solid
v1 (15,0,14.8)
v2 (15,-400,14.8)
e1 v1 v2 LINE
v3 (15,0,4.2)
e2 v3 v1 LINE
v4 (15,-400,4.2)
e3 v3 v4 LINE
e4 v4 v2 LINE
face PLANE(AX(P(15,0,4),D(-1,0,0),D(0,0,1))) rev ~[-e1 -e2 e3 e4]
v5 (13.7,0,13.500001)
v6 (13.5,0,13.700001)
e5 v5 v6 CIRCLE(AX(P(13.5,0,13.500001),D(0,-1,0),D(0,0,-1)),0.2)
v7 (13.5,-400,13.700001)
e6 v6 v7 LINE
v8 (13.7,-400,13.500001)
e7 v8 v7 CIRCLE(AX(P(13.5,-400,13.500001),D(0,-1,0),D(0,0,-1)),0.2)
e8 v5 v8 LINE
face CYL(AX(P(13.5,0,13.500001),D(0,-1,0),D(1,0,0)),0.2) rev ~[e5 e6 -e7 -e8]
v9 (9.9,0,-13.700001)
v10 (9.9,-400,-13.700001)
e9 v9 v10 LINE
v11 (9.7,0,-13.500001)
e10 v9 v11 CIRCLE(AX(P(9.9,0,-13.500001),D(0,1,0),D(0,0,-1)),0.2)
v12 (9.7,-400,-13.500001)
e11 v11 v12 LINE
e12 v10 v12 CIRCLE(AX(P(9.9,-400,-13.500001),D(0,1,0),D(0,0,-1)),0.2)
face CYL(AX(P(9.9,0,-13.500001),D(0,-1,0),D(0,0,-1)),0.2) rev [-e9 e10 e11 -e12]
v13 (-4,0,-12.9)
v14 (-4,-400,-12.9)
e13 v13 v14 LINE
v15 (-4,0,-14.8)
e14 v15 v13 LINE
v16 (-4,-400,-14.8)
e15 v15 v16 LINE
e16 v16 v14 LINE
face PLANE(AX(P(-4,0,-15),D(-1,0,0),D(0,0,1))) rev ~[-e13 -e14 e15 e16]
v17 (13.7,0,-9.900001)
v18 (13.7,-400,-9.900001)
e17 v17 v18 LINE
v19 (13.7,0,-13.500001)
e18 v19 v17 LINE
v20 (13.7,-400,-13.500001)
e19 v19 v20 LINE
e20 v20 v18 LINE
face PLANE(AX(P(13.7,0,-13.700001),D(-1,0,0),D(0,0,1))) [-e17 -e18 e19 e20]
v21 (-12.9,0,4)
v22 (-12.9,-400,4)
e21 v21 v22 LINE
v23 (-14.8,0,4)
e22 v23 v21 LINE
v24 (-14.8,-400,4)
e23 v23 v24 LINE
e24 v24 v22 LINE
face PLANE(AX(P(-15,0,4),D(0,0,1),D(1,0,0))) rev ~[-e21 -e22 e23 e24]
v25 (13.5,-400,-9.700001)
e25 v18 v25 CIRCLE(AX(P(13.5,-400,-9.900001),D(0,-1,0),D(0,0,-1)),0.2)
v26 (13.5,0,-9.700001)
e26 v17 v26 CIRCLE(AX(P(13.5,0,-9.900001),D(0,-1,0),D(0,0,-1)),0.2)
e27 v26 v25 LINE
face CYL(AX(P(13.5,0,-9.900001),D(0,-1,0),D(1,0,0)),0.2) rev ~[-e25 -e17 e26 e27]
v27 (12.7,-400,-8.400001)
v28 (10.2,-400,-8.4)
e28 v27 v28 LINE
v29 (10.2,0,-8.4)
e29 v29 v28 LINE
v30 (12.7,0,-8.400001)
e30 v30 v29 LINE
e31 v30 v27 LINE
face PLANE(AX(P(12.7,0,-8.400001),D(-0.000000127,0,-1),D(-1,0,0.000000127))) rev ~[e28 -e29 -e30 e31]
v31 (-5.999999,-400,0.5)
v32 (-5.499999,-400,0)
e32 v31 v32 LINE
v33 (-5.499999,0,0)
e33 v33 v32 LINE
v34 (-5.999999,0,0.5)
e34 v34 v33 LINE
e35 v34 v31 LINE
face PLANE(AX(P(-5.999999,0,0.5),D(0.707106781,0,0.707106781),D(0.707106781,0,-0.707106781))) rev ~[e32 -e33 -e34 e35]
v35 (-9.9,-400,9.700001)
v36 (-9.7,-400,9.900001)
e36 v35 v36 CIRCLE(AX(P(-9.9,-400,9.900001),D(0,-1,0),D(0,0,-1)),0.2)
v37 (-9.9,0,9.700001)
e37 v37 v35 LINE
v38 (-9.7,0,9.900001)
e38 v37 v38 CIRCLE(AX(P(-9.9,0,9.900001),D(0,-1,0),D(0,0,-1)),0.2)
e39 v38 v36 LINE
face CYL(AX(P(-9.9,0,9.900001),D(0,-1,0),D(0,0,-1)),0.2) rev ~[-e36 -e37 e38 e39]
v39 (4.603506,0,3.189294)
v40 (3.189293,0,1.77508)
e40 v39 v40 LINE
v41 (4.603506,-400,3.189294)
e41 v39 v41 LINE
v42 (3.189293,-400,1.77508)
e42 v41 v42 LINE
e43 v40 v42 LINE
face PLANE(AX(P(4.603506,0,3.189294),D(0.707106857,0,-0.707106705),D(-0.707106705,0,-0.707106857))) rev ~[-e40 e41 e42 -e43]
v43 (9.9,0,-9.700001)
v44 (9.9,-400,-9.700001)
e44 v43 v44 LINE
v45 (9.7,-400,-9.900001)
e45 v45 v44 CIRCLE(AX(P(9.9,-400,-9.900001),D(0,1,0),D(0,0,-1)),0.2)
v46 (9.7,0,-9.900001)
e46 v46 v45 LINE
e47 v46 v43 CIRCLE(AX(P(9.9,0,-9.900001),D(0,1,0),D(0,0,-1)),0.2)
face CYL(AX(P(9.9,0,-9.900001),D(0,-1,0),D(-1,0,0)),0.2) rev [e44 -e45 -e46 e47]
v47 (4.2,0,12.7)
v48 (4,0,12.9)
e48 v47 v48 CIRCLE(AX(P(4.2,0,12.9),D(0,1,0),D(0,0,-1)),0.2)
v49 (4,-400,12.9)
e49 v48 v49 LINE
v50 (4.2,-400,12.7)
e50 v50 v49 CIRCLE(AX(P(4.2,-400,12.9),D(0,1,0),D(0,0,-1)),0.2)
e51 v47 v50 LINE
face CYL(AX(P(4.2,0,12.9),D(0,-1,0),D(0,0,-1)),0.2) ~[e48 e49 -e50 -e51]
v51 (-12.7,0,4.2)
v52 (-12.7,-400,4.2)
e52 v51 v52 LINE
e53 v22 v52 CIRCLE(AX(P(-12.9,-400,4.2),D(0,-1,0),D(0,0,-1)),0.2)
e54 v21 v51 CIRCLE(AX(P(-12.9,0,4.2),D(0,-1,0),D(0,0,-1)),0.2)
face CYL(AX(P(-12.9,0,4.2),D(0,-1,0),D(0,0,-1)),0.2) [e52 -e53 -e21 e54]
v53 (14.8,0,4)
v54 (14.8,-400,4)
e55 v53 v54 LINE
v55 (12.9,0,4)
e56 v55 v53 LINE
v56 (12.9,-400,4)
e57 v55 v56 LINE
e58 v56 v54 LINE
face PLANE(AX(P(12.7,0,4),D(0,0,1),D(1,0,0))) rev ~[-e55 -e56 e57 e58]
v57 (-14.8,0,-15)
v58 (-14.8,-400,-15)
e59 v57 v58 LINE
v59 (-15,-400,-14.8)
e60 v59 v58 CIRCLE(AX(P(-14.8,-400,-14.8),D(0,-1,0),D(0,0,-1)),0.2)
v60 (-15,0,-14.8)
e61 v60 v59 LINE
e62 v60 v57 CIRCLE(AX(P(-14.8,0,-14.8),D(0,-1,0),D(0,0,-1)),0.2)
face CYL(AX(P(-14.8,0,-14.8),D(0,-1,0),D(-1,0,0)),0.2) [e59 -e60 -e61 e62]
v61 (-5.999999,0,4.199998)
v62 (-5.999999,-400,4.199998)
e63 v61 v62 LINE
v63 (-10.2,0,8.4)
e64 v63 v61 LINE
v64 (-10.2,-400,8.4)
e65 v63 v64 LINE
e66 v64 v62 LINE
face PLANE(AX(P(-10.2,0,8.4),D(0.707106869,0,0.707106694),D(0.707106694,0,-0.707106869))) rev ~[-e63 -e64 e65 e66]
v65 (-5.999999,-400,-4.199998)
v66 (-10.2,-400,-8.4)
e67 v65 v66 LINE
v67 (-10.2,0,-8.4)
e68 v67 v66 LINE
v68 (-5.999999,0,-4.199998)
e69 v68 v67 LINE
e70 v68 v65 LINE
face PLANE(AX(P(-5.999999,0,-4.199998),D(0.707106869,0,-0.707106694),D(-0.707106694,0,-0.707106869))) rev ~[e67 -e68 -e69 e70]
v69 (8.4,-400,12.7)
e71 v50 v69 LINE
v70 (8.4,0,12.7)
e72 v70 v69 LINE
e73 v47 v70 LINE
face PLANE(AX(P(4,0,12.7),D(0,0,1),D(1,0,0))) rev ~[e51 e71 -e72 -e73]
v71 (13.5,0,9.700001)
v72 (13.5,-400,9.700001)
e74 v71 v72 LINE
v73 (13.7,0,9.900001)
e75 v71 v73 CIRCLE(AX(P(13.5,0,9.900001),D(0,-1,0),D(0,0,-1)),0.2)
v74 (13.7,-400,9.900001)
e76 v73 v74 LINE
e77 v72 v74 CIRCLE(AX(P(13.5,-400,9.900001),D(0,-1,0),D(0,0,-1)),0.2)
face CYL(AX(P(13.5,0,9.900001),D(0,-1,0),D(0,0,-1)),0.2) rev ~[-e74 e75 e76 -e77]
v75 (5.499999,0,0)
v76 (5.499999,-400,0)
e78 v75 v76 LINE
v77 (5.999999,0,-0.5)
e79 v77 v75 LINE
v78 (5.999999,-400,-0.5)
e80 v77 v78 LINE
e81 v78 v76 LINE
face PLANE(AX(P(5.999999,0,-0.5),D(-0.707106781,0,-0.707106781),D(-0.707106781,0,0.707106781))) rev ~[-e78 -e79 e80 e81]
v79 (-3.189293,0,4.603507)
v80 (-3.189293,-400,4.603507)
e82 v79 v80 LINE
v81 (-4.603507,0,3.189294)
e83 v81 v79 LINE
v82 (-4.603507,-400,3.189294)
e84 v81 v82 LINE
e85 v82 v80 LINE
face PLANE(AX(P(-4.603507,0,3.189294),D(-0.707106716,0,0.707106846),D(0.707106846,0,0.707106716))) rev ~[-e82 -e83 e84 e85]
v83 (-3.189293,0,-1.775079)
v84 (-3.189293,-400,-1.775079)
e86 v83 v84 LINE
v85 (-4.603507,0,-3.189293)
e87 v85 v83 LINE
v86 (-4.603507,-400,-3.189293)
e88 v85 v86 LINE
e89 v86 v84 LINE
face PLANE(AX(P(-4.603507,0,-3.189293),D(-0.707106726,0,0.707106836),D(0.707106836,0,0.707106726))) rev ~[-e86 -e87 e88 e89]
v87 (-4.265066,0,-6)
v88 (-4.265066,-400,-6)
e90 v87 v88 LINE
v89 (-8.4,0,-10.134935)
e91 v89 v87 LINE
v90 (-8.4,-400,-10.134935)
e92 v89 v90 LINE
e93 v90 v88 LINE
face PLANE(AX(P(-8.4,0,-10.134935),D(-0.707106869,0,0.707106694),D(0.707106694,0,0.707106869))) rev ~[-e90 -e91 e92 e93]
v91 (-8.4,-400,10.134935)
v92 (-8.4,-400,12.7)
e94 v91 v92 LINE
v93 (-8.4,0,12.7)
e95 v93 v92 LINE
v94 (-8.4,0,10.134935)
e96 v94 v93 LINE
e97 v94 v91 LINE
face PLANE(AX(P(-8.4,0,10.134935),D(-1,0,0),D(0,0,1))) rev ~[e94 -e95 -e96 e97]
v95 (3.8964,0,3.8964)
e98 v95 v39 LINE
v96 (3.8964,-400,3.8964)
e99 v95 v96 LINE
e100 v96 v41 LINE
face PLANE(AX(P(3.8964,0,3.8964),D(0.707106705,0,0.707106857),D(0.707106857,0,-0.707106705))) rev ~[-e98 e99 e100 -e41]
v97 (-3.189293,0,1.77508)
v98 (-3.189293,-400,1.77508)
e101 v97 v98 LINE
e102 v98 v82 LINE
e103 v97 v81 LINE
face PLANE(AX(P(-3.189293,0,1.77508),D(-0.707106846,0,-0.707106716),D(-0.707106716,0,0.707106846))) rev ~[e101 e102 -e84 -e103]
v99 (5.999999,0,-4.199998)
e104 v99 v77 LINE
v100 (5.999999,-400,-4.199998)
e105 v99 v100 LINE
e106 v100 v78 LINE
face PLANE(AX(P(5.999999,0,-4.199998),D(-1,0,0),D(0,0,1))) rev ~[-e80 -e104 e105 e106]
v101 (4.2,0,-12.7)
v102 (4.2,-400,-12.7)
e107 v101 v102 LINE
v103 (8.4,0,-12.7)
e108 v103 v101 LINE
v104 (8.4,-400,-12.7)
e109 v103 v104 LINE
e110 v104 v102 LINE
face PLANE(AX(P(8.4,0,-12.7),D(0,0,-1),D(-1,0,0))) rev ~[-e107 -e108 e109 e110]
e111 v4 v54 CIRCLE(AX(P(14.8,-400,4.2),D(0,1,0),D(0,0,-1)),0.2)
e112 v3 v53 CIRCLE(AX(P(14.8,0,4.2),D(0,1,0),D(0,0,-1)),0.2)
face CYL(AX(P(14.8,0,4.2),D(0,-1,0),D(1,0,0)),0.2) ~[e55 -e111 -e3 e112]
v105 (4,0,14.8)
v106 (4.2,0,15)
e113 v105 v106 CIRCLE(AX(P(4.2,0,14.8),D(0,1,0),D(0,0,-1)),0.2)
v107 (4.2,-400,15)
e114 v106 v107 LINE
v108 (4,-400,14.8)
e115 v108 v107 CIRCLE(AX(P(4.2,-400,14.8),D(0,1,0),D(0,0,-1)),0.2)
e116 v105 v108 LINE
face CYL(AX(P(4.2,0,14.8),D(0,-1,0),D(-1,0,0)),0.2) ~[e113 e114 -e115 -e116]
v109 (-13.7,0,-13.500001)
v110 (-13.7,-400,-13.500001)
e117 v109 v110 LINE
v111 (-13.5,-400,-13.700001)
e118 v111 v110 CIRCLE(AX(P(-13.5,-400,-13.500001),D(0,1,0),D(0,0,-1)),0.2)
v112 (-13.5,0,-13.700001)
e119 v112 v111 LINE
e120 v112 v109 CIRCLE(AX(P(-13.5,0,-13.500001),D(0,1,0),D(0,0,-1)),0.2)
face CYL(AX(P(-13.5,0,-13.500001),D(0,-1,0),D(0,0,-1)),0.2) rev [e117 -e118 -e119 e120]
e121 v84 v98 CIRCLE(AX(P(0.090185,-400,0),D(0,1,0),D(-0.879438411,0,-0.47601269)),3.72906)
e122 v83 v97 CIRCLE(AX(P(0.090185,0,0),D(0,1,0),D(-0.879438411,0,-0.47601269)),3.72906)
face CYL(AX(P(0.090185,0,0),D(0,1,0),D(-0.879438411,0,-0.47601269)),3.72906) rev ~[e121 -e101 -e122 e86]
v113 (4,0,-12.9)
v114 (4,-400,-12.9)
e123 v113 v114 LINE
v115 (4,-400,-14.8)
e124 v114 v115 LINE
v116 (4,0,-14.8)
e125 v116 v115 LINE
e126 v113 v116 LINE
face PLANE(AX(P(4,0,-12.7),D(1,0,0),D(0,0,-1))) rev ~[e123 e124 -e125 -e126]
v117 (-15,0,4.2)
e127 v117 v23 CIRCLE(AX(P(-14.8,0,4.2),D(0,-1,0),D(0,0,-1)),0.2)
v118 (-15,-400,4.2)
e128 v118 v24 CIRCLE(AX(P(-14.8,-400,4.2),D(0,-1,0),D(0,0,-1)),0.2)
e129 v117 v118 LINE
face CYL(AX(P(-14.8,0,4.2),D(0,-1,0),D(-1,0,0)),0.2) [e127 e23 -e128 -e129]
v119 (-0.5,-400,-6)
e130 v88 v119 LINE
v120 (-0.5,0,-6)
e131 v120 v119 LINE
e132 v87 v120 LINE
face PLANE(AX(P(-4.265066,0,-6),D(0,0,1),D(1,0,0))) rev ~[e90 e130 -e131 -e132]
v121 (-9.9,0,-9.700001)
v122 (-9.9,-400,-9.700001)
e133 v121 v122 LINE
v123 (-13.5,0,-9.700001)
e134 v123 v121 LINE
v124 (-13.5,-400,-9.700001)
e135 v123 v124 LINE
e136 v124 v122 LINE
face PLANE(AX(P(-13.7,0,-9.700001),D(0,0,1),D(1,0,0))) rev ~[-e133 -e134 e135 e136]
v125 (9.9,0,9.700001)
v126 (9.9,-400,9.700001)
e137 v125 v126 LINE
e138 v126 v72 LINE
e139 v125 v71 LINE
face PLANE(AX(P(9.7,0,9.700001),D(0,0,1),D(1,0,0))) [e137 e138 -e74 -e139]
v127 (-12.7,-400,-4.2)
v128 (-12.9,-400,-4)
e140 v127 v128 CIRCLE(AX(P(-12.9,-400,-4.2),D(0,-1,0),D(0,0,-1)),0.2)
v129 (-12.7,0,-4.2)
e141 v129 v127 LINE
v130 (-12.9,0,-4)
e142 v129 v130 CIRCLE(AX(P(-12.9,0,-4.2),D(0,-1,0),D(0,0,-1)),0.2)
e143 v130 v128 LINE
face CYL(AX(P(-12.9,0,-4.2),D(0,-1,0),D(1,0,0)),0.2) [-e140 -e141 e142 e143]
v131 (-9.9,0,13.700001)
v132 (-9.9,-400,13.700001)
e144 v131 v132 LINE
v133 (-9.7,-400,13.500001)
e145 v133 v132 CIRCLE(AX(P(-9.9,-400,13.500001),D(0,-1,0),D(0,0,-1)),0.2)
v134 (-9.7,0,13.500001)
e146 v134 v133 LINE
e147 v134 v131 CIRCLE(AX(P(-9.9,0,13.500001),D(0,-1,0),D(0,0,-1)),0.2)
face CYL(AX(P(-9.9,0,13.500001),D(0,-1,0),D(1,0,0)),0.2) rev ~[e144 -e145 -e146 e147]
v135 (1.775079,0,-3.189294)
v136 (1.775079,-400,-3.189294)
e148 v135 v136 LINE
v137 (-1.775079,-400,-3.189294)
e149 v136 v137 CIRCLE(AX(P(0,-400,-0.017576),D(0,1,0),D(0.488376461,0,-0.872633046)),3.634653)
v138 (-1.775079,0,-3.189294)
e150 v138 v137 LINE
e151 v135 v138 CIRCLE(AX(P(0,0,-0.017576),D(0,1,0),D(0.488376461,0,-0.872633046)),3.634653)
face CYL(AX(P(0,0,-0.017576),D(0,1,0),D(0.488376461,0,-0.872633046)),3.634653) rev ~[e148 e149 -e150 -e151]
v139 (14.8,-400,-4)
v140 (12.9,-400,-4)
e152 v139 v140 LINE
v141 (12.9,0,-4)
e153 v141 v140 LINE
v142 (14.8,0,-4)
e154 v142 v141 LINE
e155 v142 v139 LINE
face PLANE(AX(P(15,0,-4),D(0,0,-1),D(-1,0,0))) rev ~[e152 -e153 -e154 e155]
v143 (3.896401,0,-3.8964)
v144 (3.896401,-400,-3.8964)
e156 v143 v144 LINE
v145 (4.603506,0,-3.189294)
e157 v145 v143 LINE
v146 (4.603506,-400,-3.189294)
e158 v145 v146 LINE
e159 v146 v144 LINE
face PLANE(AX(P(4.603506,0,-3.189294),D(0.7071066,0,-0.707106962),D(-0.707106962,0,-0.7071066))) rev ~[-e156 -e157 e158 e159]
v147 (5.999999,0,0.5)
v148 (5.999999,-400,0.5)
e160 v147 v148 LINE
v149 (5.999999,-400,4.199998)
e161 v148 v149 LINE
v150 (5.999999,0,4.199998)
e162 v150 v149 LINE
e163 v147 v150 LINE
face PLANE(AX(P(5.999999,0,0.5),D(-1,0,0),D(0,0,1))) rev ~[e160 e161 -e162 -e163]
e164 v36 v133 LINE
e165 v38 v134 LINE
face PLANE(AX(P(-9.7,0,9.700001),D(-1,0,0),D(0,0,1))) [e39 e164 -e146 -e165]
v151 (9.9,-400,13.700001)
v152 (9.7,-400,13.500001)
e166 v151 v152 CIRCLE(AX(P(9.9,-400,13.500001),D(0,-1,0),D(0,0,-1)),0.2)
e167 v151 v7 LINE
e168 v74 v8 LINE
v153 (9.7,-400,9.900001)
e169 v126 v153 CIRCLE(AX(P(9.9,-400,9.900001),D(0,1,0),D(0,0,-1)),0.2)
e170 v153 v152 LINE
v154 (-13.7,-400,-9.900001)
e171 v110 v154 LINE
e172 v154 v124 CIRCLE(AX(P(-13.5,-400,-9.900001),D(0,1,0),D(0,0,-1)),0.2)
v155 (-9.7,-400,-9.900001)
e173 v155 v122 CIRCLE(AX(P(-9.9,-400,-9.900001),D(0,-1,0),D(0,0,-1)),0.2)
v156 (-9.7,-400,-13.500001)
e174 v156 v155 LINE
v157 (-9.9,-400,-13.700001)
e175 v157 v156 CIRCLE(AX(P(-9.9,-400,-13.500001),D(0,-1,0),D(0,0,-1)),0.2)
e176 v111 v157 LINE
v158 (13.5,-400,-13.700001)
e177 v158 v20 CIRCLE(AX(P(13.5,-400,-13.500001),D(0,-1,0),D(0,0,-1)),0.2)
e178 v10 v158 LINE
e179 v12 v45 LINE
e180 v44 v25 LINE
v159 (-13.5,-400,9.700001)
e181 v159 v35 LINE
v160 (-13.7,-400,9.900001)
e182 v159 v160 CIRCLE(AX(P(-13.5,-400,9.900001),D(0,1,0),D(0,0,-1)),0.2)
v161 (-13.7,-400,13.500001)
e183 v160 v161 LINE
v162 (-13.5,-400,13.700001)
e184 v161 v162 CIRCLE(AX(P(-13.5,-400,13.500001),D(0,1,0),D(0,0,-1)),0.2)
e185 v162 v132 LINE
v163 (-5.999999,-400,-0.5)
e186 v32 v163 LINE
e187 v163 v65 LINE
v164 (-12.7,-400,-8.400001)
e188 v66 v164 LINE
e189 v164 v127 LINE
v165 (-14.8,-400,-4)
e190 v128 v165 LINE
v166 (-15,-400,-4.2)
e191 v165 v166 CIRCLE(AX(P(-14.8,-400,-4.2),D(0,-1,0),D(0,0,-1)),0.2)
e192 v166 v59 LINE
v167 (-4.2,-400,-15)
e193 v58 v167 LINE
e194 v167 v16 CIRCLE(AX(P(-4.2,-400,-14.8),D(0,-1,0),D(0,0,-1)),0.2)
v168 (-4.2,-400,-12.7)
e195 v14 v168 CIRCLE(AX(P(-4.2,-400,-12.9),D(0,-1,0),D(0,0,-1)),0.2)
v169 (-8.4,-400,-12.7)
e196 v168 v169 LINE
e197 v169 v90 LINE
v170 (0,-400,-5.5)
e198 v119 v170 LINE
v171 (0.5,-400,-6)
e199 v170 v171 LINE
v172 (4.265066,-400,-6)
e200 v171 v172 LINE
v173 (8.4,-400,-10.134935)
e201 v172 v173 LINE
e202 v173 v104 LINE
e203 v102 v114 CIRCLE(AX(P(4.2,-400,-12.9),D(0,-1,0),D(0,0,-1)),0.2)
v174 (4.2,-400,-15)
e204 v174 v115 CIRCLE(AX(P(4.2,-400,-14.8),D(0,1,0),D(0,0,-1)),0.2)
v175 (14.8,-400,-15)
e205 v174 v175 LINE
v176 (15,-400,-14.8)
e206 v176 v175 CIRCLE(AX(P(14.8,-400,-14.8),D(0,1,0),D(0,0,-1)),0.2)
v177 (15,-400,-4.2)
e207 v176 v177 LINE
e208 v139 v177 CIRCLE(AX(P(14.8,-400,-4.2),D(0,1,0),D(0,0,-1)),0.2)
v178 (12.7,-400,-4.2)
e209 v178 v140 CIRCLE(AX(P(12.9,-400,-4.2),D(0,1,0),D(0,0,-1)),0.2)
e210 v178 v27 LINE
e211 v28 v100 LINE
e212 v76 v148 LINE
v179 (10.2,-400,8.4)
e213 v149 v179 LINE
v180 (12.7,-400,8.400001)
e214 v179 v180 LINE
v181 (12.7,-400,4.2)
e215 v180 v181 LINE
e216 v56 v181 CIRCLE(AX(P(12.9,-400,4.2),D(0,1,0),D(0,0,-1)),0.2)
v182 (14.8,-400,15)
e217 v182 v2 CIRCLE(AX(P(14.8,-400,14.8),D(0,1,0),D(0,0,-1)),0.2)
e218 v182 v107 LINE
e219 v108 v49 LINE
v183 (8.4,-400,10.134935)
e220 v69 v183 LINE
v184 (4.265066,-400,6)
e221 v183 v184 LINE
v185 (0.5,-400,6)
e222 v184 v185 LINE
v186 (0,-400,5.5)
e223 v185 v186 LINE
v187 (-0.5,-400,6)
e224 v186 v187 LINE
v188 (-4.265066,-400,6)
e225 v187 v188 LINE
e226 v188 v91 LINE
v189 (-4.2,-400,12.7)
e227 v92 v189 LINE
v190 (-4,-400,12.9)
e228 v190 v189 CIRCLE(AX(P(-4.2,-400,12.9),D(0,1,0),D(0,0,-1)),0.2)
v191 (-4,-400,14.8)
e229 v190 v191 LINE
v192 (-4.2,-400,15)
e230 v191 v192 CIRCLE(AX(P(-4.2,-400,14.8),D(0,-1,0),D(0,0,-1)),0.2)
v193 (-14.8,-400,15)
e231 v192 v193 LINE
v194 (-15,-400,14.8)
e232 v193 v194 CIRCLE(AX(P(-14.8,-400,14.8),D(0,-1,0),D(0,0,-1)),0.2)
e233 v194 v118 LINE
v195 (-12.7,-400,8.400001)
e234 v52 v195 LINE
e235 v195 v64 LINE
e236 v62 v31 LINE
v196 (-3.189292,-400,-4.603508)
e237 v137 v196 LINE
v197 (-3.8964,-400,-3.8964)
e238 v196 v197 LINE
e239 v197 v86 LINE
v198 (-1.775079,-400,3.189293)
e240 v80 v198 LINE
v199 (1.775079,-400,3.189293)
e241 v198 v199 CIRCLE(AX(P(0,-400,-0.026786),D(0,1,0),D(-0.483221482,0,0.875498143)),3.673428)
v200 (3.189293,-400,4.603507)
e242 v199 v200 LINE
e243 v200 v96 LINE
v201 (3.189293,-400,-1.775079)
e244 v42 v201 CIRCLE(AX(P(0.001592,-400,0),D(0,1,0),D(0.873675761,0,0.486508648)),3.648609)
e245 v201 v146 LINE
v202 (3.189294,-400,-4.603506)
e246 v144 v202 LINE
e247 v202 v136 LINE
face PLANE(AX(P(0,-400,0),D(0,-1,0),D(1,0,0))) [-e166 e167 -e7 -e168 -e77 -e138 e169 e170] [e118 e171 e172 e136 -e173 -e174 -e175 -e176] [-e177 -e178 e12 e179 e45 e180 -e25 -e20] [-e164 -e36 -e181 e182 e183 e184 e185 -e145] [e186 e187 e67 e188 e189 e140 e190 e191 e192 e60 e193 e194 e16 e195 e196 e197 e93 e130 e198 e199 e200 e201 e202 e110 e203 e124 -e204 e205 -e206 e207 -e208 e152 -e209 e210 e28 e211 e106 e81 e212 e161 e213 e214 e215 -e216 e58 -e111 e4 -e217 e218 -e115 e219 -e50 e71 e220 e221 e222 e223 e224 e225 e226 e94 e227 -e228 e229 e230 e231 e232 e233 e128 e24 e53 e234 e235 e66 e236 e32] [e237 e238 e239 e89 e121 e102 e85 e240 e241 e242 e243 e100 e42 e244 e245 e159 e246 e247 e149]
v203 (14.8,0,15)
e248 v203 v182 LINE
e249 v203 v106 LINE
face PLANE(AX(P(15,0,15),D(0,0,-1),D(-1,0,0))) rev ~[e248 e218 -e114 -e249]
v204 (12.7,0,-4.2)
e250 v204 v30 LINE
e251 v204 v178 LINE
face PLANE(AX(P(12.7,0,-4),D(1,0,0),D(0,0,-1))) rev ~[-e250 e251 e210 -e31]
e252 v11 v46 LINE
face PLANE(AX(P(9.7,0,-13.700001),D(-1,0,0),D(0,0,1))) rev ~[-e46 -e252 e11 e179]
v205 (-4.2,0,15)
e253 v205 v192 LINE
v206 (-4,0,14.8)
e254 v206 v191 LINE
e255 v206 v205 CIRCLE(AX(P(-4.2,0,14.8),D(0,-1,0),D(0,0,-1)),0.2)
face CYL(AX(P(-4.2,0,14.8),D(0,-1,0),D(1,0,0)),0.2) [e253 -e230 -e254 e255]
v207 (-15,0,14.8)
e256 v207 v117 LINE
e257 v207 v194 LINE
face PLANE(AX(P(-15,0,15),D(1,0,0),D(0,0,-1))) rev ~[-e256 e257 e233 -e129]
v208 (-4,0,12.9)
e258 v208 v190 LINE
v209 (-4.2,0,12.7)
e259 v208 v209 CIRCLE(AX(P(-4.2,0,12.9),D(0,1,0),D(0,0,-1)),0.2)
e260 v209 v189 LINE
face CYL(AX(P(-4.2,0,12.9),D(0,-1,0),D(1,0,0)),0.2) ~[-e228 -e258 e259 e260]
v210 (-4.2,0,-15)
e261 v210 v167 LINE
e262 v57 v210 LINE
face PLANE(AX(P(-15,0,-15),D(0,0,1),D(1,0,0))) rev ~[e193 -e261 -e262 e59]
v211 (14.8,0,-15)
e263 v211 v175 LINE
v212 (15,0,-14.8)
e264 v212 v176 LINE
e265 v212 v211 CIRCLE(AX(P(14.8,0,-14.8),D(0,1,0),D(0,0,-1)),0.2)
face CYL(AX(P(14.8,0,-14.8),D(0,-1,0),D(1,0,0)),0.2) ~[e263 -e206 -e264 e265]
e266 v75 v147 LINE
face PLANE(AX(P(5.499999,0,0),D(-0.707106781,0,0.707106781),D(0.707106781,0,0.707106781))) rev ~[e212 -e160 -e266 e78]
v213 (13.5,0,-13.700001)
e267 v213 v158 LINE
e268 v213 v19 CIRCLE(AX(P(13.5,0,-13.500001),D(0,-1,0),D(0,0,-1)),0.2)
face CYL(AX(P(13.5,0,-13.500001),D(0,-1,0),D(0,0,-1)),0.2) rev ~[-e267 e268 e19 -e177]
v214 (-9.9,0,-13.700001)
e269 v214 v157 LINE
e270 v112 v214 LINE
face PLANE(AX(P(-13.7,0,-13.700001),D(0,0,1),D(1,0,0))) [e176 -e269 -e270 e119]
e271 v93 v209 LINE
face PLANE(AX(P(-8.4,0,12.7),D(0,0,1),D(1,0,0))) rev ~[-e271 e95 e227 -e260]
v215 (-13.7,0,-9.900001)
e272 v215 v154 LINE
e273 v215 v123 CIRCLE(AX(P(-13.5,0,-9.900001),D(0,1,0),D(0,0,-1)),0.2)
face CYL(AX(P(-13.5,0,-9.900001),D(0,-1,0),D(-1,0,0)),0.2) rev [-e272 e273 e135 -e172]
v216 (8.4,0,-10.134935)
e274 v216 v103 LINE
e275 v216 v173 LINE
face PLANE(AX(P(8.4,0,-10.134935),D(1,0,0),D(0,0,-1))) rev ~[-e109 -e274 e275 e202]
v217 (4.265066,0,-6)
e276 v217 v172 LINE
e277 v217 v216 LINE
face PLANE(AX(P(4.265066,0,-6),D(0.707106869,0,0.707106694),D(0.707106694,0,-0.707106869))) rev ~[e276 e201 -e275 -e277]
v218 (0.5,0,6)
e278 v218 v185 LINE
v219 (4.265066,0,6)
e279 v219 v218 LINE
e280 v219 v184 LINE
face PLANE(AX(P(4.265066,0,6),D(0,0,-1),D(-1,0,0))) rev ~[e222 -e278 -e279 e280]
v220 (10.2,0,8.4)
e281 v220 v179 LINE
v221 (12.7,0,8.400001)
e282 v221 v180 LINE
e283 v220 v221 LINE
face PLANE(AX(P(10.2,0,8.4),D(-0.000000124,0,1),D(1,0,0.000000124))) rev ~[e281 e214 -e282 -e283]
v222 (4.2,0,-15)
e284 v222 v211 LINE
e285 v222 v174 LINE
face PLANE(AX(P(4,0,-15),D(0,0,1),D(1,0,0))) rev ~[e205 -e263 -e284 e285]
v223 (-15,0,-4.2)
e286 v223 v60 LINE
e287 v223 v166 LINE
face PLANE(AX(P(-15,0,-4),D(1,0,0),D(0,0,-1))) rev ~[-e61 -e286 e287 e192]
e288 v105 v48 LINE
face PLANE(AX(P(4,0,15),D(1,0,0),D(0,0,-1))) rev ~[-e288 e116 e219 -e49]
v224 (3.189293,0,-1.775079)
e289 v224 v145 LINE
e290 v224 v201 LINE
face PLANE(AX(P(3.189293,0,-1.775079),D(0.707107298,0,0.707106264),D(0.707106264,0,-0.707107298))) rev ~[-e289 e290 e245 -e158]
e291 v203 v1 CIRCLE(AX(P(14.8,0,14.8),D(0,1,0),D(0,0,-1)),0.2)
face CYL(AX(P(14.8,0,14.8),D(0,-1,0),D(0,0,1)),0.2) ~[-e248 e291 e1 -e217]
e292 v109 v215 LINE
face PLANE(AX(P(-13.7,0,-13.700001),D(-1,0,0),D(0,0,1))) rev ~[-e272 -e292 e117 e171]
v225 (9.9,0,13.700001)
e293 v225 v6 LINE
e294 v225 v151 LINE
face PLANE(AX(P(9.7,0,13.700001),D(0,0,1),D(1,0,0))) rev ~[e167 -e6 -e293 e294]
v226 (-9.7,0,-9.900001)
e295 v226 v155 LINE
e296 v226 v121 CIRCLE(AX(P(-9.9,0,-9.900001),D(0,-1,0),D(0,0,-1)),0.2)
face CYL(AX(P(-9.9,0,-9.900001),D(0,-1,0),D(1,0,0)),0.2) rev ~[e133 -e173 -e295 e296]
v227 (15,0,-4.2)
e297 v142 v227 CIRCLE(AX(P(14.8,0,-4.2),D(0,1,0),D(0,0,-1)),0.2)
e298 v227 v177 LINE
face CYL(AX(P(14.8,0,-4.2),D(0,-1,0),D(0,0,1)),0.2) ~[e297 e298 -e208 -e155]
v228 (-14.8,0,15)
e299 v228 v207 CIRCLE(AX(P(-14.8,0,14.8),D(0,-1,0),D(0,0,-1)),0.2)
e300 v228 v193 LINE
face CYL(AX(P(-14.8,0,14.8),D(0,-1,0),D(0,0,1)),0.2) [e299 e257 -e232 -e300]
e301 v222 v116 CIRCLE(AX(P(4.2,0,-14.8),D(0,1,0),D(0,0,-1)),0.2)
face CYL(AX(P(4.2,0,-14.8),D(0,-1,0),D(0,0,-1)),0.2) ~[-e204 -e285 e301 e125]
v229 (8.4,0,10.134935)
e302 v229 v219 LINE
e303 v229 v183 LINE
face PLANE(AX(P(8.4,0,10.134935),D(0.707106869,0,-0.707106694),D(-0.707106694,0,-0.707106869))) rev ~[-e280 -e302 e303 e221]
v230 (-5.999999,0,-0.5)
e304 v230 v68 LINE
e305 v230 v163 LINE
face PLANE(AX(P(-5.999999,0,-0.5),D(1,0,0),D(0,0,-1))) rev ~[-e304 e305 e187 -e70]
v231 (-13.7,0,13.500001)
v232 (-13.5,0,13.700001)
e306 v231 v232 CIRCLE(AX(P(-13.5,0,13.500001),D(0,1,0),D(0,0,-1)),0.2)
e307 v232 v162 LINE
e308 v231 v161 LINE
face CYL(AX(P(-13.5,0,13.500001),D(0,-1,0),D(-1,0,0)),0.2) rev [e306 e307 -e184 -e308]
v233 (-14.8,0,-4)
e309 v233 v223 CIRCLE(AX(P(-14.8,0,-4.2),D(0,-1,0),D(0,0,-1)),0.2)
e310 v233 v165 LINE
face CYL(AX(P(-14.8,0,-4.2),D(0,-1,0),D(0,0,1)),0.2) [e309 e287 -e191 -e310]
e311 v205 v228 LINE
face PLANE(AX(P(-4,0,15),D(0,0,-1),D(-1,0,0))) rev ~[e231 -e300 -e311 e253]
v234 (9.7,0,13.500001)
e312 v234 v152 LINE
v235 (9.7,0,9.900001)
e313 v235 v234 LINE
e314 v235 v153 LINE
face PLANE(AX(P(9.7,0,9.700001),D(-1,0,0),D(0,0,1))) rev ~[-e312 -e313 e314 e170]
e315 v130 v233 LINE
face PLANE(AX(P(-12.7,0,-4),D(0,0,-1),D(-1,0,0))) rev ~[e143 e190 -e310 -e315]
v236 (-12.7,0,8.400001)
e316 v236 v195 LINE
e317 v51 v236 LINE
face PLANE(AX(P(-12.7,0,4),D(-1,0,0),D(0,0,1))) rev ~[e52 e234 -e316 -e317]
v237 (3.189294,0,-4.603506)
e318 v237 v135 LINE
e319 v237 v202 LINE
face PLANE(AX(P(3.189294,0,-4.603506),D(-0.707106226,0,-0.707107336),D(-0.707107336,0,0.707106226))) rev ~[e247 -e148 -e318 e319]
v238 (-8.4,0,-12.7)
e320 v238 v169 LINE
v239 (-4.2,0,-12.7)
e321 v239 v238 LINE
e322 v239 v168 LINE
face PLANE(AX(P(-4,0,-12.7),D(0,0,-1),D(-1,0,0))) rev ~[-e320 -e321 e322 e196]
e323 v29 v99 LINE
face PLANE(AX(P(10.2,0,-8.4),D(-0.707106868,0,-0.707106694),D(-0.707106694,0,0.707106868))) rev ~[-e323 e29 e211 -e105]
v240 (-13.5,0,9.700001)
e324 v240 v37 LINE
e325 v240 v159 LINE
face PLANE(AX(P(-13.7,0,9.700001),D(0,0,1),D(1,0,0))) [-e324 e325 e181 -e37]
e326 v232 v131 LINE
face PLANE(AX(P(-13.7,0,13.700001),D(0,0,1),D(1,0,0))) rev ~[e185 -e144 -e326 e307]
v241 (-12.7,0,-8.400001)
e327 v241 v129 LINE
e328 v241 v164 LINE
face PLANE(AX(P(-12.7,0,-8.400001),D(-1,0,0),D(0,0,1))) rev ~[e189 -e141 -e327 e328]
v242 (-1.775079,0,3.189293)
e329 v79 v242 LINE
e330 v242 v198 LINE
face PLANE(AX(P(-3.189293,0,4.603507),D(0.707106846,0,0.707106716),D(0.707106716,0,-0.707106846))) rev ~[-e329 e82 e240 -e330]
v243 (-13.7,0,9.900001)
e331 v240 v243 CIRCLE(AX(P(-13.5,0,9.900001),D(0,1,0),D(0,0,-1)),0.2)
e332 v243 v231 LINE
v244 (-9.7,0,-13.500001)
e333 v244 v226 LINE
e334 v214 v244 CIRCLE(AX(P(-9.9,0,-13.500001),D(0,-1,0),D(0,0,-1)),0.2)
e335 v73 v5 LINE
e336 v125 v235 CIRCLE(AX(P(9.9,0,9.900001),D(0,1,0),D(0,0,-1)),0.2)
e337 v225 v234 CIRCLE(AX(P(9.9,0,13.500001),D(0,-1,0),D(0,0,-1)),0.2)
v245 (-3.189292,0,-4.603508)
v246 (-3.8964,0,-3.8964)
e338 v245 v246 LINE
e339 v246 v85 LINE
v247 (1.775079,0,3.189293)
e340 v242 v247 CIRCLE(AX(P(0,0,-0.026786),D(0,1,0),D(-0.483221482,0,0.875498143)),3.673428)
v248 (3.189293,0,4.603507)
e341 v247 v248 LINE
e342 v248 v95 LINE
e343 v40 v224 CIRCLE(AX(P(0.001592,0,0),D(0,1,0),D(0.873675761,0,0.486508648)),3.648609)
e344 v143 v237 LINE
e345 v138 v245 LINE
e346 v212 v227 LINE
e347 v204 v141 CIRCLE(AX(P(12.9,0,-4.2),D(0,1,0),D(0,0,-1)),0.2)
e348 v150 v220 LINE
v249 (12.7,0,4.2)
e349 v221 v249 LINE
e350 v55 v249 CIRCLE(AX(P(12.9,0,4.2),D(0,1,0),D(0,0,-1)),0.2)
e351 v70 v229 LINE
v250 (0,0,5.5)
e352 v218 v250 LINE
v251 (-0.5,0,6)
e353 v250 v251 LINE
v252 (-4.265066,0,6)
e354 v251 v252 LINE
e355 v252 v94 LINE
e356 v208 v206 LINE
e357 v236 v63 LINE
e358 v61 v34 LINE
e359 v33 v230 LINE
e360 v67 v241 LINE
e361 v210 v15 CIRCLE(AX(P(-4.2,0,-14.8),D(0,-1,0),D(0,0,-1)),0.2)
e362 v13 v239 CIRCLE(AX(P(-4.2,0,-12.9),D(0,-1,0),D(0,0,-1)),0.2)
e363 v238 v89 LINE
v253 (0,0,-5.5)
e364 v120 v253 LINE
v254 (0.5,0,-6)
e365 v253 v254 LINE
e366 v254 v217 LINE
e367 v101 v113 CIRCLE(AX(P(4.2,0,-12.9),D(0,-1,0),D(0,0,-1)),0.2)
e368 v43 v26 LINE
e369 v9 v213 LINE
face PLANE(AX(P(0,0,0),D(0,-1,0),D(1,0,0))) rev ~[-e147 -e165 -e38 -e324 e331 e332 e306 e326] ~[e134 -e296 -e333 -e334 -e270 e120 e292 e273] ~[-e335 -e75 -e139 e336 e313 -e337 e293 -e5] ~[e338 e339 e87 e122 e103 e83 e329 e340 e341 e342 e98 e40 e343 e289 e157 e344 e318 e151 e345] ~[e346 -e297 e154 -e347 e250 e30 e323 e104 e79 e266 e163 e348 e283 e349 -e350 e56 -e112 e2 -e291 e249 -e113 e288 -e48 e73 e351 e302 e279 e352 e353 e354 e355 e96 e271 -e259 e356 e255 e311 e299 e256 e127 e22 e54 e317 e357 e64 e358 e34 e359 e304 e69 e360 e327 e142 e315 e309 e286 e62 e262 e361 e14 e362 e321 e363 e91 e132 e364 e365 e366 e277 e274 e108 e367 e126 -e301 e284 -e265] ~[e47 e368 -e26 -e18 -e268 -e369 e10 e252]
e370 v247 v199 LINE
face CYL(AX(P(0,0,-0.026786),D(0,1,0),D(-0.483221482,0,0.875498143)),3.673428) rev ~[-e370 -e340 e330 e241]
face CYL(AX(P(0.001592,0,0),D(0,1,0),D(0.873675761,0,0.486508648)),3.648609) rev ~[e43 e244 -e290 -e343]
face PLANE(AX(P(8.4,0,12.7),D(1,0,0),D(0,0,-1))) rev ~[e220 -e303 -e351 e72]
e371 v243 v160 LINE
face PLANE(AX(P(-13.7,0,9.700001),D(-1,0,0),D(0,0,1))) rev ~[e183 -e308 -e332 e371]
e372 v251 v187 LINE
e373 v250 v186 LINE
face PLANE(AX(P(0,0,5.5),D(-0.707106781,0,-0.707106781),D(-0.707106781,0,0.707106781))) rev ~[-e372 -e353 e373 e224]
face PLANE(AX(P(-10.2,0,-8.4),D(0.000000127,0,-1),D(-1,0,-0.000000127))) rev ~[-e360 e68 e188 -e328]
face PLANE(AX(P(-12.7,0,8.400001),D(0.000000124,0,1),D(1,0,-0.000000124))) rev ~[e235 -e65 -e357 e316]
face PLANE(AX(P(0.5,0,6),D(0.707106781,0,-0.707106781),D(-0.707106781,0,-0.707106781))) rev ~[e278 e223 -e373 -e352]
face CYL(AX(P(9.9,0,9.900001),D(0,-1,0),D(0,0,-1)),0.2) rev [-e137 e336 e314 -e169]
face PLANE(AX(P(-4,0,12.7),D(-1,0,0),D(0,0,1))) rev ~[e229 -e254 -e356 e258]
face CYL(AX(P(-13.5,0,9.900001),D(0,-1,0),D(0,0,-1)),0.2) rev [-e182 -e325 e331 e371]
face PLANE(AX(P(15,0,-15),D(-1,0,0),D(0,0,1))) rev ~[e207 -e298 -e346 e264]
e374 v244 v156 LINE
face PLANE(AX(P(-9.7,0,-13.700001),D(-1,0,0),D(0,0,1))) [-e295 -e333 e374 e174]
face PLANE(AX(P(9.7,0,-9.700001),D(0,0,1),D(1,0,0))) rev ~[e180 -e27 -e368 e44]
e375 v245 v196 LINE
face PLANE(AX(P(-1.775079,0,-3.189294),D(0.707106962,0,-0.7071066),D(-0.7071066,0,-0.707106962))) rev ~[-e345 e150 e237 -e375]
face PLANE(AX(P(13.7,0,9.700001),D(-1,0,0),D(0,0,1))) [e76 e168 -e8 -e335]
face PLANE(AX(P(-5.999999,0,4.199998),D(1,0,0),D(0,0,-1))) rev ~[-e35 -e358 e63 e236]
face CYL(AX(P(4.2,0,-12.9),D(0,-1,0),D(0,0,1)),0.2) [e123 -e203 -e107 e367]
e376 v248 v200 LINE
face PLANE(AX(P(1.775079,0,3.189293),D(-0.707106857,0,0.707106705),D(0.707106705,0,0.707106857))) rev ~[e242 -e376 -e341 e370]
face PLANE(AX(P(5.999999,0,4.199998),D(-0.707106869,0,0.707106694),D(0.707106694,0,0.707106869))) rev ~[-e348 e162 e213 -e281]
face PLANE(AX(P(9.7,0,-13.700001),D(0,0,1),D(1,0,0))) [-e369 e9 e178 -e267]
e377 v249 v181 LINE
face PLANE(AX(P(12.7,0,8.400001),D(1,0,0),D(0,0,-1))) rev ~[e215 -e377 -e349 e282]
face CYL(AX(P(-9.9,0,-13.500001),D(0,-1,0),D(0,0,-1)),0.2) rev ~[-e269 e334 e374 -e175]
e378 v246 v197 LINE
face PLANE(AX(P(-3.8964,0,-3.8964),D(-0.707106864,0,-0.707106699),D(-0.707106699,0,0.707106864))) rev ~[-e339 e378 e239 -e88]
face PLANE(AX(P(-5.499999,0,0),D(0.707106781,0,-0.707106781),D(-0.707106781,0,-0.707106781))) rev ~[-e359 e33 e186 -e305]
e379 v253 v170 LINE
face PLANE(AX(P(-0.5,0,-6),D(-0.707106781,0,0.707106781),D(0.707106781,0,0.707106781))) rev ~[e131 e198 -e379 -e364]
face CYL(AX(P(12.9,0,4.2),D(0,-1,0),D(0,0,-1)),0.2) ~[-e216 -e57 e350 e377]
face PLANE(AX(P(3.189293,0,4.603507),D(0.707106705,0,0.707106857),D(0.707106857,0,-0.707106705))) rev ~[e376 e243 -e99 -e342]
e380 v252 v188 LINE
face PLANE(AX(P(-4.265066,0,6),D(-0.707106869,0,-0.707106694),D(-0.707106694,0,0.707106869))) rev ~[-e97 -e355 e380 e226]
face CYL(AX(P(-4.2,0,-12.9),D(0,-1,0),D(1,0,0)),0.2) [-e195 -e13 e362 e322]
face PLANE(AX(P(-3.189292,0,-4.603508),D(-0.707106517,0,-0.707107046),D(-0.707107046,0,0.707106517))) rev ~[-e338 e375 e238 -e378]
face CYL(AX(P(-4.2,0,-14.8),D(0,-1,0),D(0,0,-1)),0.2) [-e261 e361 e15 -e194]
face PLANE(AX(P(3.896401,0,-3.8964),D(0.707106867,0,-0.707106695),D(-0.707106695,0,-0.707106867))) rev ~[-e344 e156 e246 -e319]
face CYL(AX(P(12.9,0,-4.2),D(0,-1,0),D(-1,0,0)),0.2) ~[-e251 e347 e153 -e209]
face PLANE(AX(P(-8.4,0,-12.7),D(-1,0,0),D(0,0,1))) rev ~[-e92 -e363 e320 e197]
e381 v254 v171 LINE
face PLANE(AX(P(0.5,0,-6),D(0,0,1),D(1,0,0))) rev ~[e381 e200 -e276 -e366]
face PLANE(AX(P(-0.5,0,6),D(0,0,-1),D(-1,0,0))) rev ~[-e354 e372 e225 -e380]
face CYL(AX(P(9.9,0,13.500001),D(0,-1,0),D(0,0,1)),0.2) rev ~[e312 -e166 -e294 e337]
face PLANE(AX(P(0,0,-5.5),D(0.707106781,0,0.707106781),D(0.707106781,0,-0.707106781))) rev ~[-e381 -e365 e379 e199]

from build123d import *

# Parameters (mm, degrees)
F0_W     = 4
F0_H     = 4
F1_DEPTH = 400
F2_R     = 0.2


# Not quite as in the source:
# - ends of sketch curves that miss each other by under 0.0002 mm in the source are joined


with BuildPart() as f1:
    # F0 (on Front) → F1 (new body)
    with BuildSketch(Plane.XZ):
        Polygon((-4, 12.7), (-4, 15), (-15, 15), (-15, 4), (-12.7, 4), (-12.7, 8.4000005318), (-10.2000002146, 8.4000002226), (-5.9999986286, 4.1999975978), (-5.9999986286, 0.5), (-5.4999986286, 0), (-5.9999986286, -0.5), (-5.9999986286, -4.1999975978), (-10.2000002146, -8.4000002226), (-12.7, -8.4000005401), (-12.7, -4), (-15, -4), (-15, -15), (-4, -15), (-4, -12.7), (-8.4, -12.7), (-8.4, -10.1349351573), (-4.265066287, -6.0000004215), (-0.5, -6.0000004215), (0, -5.5000004215), (0.5, -6.0000004215), (4.265066287, -6.0000004215), (8.4, -10.1349351573), (8.4, -12.7), (4, -12.7), (4, -15), (15, -15), (15, -4), (12.7, -4), (12.7, -8.4000005318), (10.2000002146, -8.4000002143), (5.9999986286, -4.1999975978), (5.9999986286, -0.5), (5.4999986286, 0), (5.9999986286, 0.5), (5.9999986286, 4.1999975978), (10.2000002146, 8.4000002226), (12.7, 8.4000005318), (12.7, 4), (15, 4), (15, 15), (4, 15), (4, 12.7), (8.4, 12.7), (8.4, 10.1349351573), (4.265066287, 6.0000004215), (0.5, 6.0000004215), (0, 5.5000004215), (-0.5, 6.0000004215), (-4.265066287, 6.0000004215), (-8.4, 10.1349351573), (-8.4, 12.7), align=None)
        with Locations((-11.7, -11.7000005318)):
            Rectangle(F0_W, F0_H, mode=Mode.SUBTRACT)
        with Locations((11.7, -11.7000005318)):
            Rectangle(F0_W, F0_H, mode=Mode.SUBTRACT)
        with BuildLine():
            Line((-3.1892931549, 1.7750800467), (-4.6035065879, 3.1892937385))
            Line((-4.6035065879, 3.1892937385), (-3.896399742, 3.896400455))
            Line((-3.896399742, 3.896400455), (-3.1892928961, 4.6035071715))
            Line((-3.1892928961, 4.6035071715), (-1.7750794631, 3.1892934797))
            ThreePointArc((-1.7750794631, 3.1892934797), (-5.13e-08, 3.6466421089), (1.7750793605, 3.1892934797))
            Line((1.7750793605, 3.1892934797), (3.1892927707, 4.6035071942))
            Line((3.1892927707, 4.6035071942), (3.896399628, 3.8964004891))
            Line((3.896399628, 3.8964004891), (4.6035064852, 3.189293784))
            Line((4.6035064852, 3.189293784), (3.189293075, 1.7750800695))
            ThreePointArc((3.189293075, 1.7750800695), (3.6502008105, 3.145e-07), (3.189293075, -1.7750794404))
            Line((3.189293075, -1.7750794404), (4.6035060628, -3.1892944964))
            Line((4.6035060628, -3.1892944964), (3.8964005729, -3.8963996238))
            Line((3.8964005729, -3.8963996238), (3.1892938779, -4.6035064911))
            Line((3.1892938779, -4.6035064911), (1.775078938, -3.189293772))
            ThreePointArc((1.775078938, -3.189293772), (8.169e-07, -3.6522284465), (-1.775078938, -3.189293772))
            Line((-1.775078938, -3.189293772), (-3.1892921382, -4.6035076966))
            Line((-3.1892921382, -4.6035076966), (-3.8964003567, -3.8964000069))
            Line((-3.8964003567, -3.8964000069), (-4.6035070554, -3.1892931432))
            Line((-4.6035070554, -3.1892931432), (-3.1892931549, -1.7750794631))
            ThreePointArc((-3.1892931549, -1.7750794631), (-3.6388745209, 2.918e-07), (-3.1892931549, 1.7750800467))
        make_face(mode=Mode.SUBTRACT)
        with Locations((-11.7, 11.7000005318)):
            Rectangle(F0_W, F0_H, mode=Mode.SUBTRACT)
        with Locations((11.7, 11.7000005318)):
            Rectangle(F0_W, F0_H, mode=Mode.SUBTRACT)
    extrude(amount=F1_DEPTH)

    # F2
    f2_edges = [f1.edges().sort_by_distance(p)[0] for p in [
        (-4, -200, 15),
        (4, -200, 15),
        (-15, -200, 15),
        (15, -200, 15),
        (-12.7, -200, 4),
        (-15, -200, 4),
        (-15, -200, -4),
        (-15, -200, -15),
        (-4, -200, -15),
        (-4, -200, -12.7),
        (-12.7, -200, -4),
        (4, -200, -15),
        (15, -200, -15),
        (12.7, -200, -4),
        (12.7, -200, 4),
        (15, -200, -4),
        (15, -200, 4),
        (-4, -200, 12.7),
        (4, -200, -12.7),
        (4, -200, 12.7),
        (9.7, -200, 13.700001),
        (-13.7, -200, 13.700001),
        (-13.7, -200, -9.700001),
        (9.7, -200, -9.700001),
        (-9.7, -200, 9.700001),
        (-9.7, -200, -13.700001),
        (13.7, -200, -13.700001),
        (13.7, -200, 9.700001),
        (13.7, -200, 13.700001),
        (-9.7, -200, 13.700001),
        (-9.7, -200, -9.700001),
        (13.7, -200, -9.700001),
        (9.7, -200, 9.700001),
        (-13.7, -200, 9.700001),
        (9.7, -200, -13.700001),
        (-13.7, -200, -13.700001),
    ]]
    fillet(f2_edges, radius=F2_R)


solid = f1.part
